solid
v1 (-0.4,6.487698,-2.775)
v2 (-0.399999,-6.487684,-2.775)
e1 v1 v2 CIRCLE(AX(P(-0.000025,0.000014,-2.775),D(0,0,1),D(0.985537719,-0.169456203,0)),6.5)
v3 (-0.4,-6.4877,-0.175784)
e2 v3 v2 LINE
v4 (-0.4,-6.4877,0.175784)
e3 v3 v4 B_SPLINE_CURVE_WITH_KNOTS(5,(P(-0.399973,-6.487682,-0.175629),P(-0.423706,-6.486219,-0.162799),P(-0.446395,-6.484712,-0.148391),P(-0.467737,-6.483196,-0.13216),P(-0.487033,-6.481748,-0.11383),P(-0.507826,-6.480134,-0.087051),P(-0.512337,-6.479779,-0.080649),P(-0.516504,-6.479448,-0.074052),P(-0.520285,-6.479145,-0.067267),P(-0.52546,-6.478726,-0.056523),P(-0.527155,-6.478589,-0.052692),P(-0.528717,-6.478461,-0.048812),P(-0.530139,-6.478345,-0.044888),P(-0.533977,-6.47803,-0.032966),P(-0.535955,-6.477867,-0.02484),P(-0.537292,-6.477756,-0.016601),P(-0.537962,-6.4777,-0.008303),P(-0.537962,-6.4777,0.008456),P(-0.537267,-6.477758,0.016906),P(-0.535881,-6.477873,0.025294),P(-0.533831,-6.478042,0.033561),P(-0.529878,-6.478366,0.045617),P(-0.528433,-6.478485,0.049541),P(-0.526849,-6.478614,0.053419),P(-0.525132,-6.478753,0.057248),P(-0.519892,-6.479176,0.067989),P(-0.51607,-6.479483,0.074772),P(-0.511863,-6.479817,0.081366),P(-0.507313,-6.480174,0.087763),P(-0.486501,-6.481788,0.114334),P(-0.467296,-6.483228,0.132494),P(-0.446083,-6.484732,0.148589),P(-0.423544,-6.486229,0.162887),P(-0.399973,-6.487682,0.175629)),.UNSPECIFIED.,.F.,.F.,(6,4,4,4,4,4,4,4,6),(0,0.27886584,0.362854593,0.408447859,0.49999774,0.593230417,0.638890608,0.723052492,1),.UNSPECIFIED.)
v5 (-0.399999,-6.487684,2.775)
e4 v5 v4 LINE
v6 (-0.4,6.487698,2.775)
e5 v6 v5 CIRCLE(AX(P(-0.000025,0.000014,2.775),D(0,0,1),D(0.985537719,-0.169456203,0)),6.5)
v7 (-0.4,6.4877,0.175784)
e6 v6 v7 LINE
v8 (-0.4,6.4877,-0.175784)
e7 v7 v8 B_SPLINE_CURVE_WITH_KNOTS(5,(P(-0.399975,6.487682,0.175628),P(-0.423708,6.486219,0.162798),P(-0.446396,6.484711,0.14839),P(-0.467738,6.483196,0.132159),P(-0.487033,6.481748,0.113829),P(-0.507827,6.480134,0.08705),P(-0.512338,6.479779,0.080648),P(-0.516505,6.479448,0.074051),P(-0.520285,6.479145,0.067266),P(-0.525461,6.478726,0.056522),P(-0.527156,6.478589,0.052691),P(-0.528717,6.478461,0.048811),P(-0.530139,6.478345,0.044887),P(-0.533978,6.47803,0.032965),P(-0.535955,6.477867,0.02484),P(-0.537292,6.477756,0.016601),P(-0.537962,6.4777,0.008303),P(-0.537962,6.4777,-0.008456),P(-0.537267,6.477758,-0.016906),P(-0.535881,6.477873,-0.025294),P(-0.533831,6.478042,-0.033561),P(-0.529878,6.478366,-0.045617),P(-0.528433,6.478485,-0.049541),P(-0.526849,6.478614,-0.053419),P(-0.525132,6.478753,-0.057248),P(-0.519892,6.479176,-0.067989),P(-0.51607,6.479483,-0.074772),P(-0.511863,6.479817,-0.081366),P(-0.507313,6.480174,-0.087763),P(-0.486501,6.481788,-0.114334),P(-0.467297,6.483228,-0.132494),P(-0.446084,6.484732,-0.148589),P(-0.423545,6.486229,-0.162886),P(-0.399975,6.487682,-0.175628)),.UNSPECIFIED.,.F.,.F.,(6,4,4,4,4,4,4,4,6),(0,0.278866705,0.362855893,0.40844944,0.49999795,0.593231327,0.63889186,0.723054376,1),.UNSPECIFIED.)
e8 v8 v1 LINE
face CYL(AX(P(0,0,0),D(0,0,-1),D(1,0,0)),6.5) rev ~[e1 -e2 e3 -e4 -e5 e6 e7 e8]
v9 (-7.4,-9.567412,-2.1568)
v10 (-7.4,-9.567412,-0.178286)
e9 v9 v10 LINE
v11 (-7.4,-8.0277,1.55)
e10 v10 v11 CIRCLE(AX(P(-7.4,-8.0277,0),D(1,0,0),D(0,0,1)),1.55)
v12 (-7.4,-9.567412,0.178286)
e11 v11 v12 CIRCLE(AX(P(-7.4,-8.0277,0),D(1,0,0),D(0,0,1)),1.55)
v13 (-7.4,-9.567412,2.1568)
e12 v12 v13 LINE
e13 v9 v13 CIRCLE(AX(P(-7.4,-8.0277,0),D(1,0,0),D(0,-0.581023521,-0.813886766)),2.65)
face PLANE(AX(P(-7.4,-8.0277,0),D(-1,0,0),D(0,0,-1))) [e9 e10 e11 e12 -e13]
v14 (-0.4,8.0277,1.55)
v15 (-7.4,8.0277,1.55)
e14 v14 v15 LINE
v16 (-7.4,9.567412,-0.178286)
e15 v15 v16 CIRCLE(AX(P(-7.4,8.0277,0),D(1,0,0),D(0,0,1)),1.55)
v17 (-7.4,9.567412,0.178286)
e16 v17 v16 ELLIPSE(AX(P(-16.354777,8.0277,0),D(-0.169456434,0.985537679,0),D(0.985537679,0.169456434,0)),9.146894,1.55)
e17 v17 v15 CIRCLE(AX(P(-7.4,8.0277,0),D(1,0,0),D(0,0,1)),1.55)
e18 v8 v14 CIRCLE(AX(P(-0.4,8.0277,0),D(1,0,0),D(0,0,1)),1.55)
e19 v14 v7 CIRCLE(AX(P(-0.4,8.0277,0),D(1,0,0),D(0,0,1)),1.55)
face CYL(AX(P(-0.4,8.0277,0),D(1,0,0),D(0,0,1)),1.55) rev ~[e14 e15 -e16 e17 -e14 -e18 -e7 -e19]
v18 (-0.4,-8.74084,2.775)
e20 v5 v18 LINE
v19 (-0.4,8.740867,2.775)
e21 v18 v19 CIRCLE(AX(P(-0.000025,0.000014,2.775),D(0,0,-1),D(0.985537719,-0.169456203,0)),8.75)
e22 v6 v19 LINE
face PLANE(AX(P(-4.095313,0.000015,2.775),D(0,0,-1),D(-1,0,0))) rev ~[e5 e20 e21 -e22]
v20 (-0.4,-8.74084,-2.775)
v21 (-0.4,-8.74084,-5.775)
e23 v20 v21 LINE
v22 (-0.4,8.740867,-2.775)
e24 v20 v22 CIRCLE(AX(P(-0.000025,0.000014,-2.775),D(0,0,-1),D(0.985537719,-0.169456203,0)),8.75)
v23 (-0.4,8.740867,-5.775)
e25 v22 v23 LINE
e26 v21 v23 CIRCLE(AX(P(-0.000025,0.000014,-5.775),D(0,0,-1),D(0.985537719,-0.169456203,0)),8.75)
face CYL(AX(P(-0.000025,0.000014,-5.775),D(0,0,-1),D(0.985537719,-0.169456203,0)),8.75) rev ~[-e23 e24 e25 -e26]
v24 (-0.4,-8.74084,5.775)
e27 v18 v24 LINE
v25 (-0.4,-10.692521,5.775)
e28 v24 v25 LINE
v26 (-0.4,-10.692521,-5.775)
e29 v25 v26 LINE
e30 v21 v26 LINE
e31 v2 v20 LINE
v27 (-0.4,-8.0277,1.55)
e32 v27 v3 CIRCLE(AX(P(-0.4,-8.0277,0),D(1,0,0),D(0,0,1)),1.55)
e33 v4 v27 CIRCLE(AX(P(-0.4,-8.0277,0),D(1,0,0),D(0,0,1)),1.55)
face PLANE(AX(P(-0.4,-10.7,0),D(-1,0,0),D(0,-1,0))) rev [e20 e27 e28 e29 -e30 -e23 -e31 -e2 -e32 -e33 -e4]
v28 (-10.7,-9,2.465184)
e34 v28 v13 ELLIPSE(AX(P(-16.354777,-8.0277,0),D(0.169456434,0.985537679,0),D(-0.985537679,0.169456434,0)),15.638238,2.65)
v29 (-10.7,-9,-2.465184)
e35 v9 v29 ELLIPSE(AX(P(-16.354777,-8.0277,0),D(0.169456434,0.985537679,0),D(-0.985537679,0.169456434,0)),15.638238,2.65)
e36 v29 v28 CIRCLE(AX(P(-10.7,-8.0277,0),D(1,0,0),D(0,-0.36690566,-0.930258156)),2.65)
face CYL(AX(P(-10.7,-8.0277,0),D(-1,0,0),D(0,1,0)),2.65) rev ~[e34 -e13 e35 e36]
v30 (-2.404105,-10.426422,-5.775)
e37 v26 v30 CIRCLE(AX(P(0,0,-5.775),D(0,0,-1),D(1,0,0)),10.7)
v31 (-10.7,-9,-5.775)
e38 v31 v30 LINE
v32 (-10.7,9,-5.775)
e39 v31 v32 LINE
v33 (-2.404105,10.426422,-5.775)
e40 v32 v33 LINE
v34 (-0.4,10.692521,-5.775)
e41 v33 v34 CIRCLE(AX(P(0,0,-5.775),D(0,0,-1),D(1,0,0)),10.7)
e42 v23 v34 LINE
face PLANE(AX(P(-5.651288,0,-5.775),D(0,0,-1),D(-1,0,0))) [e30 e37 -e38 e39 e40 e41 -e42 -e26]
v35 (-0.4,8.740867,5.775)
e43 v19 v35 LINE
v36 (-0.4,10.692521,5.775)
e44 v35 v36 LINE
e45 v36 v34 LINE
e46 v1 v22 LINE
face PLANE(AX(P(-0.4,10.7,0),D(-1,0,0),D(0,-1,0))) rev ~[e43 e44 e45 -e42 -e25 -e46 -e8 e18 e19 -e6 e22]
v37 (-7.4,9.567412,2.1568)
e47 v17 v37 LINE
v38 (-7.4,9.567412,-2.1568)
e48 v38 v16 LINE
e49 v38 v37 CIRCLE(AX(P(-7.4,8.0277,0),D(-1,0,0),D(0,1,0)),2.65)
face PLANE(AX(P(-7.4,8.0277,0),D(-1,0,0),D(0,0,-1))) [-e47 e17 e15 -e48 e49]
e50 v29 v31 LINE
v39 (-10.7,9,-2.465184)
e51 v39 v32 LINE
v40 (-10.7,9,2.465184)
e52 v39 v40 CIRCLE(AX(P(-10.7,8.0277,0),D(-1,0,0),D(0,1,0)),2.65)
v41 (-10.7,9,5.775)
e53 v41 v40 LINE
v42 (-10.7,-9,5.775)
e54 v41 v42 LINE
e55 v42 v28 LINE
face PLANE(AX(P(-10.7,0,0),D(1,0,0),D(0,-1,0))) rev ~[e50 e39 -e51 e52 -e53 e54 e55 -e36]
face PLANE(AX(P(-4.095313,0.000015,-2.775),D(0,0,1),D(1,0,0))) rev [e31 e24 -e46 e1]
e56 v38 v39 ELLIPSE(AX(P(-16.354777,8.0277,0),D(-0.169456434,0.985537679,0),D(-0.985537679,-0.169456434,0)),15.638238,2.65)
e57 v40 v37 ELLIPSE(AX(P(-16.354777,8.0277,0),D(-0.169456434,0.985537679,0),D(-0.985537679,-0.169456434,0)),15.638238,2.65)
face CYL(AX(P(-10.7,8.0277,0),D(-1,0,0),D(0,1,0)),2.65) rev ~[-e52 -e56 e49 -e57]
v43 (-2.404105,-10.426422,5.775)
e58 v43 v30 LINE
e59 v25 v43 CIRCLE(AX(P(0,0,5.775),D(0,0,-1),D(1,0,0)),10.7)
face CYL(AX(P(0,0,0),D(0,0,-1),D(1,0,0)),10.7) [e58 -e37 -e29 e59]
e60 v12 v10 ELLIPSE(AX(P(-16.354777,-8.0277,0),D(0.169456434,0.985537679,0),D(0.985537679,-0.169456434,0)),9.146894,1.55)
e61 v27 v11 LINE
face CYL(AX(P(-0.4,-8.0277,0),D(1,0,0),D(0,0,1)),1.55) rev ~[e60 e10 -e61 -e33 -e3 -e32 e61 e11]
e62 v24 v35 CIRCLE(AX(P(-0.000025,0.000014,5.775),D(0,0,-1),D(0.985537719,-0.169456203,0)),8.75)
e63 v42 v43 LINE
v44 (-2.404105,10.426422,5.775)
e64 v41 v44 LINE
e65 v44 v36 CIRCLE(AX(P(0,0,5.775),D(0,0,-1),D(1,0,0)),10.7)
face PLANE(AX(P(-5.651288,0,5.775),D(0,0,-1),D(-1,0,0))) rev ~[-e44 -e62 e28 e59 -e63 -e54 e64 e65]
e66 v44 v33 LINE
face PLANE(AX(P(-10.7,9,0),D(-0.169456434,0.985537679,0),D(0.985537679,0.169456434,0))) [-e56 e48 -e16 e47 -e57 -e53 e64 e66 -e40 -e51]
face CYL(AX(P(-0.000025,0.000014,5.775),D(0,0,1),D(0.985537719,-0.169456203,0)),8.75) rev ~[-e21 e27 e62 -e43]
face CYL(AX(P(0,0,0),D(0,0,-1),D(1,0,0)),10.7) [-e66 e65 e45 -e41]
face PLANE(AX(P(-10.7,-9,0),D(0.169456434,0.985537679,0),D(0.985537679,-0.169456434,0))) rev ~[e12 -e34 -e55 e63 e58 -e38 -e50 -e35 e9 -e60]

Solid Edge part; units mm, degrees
sketch "Sketch1" plane through (0, 0, 0) normal (0, 0, 1) x (1, 0, 0)
  line L0 (0, -6.5) -> (0, -10.7)
  arc A0 (0, -10.7) -> (-2.4041, -10.4264) centre (0, 0) cw
  line L1 (-10.7, -9) -> (-2.4041, -10.4264)
  line L2 (-10.7, 0) -> (-10.7, -9)
  line L3 (-10.7, 0) -> (-10.7, 9)
  line L4 (-10.7, 9) -> (-2.4041, 10.4264)
  line L5 (0, 10.7) -> (0, 6.5)
  arc A1 (-2.4041, 10.4264) -> (0, 10.7) centre (0, 0) cw
  arc A2 (0, -6.5) -> (0, 6.5) centre (0, 0) cw
extrude "Protrusion1" add sketch "Sketch1" along normal mid plane 11.55
sketch "Sketch2" plane through (-5.35, 0, 5.775) normal (0, 0, 1) x (0.9855377, -0.1694562, 0)
  arc A0 (6.7554, -7.7169) -> (3.7899, 9.53) centre (5.2726, 0.9066) cw
  line L0 (3.7899, 9.53) -> (4.1712, 7.3126)
  arc A1 (4.1712, 7.3126) -> (6.3741, -5.4994) centre (5.2726, 0.9066) ccw
  line L1 (6.3741, -5.4994) -> (6.7554, -7.7169)
extrude "ExtrudedCutout_1" cut sketch "Sketch2" against normal blind 3
mirror "Mirror1" about plane through (0, 0, 0) normal (0, 0, 1) of "ExtrudedCutout_1"
sketch "Sketch3" plane through (0, 0, 0) normal (0, 0, -1) x (-1, 0, 0)
  line L0 (0.4, 6.4877) -> (0, 6.4877)
  line L1 (0, 6.4877) -> (0, 10.7)
  line L2 (0, 10.7) -> (0.4, 10.7)
  line L3 (0.4, 10.7) -> (0.4, 6.4877)
extrude "ExtrudedCutout_2" cut sketch "Sketch3" along normal mid plane 12.1654
mirror "Mirror2" about plane through (0, 0, 0) normal (0, 1, 0) of "ExtrudedCutout_2"
sketch "Sketch4" plane through (-0.4, 8.5901, 0) normal (1, 0, 0) x (0, 0, 1)
  circle A0 centre (0, 0.5624) radius 1.55
  circle A1 centre (0, 16.6178) radius 1.55
  dimension "D1" = 3.1
  dimension "D2" = 1.54
extrude "ExtrudedCutout_3" cut sketch "Sketch4" along normal mid plane 184.4666
sketch "Sketch5" plane through (-10.7, 0, 0) normal (-1, 0, 0) x (0, 1, 0)
  circle A0 centre (-8.0277, 0) radius 2.65
  circle A1 centre (8.0277, 0) radius 2.65
extrude "ExtrudedCutout_4" cut sketch "Sketch5" against normal blind 3.3
properties material "PLA"
